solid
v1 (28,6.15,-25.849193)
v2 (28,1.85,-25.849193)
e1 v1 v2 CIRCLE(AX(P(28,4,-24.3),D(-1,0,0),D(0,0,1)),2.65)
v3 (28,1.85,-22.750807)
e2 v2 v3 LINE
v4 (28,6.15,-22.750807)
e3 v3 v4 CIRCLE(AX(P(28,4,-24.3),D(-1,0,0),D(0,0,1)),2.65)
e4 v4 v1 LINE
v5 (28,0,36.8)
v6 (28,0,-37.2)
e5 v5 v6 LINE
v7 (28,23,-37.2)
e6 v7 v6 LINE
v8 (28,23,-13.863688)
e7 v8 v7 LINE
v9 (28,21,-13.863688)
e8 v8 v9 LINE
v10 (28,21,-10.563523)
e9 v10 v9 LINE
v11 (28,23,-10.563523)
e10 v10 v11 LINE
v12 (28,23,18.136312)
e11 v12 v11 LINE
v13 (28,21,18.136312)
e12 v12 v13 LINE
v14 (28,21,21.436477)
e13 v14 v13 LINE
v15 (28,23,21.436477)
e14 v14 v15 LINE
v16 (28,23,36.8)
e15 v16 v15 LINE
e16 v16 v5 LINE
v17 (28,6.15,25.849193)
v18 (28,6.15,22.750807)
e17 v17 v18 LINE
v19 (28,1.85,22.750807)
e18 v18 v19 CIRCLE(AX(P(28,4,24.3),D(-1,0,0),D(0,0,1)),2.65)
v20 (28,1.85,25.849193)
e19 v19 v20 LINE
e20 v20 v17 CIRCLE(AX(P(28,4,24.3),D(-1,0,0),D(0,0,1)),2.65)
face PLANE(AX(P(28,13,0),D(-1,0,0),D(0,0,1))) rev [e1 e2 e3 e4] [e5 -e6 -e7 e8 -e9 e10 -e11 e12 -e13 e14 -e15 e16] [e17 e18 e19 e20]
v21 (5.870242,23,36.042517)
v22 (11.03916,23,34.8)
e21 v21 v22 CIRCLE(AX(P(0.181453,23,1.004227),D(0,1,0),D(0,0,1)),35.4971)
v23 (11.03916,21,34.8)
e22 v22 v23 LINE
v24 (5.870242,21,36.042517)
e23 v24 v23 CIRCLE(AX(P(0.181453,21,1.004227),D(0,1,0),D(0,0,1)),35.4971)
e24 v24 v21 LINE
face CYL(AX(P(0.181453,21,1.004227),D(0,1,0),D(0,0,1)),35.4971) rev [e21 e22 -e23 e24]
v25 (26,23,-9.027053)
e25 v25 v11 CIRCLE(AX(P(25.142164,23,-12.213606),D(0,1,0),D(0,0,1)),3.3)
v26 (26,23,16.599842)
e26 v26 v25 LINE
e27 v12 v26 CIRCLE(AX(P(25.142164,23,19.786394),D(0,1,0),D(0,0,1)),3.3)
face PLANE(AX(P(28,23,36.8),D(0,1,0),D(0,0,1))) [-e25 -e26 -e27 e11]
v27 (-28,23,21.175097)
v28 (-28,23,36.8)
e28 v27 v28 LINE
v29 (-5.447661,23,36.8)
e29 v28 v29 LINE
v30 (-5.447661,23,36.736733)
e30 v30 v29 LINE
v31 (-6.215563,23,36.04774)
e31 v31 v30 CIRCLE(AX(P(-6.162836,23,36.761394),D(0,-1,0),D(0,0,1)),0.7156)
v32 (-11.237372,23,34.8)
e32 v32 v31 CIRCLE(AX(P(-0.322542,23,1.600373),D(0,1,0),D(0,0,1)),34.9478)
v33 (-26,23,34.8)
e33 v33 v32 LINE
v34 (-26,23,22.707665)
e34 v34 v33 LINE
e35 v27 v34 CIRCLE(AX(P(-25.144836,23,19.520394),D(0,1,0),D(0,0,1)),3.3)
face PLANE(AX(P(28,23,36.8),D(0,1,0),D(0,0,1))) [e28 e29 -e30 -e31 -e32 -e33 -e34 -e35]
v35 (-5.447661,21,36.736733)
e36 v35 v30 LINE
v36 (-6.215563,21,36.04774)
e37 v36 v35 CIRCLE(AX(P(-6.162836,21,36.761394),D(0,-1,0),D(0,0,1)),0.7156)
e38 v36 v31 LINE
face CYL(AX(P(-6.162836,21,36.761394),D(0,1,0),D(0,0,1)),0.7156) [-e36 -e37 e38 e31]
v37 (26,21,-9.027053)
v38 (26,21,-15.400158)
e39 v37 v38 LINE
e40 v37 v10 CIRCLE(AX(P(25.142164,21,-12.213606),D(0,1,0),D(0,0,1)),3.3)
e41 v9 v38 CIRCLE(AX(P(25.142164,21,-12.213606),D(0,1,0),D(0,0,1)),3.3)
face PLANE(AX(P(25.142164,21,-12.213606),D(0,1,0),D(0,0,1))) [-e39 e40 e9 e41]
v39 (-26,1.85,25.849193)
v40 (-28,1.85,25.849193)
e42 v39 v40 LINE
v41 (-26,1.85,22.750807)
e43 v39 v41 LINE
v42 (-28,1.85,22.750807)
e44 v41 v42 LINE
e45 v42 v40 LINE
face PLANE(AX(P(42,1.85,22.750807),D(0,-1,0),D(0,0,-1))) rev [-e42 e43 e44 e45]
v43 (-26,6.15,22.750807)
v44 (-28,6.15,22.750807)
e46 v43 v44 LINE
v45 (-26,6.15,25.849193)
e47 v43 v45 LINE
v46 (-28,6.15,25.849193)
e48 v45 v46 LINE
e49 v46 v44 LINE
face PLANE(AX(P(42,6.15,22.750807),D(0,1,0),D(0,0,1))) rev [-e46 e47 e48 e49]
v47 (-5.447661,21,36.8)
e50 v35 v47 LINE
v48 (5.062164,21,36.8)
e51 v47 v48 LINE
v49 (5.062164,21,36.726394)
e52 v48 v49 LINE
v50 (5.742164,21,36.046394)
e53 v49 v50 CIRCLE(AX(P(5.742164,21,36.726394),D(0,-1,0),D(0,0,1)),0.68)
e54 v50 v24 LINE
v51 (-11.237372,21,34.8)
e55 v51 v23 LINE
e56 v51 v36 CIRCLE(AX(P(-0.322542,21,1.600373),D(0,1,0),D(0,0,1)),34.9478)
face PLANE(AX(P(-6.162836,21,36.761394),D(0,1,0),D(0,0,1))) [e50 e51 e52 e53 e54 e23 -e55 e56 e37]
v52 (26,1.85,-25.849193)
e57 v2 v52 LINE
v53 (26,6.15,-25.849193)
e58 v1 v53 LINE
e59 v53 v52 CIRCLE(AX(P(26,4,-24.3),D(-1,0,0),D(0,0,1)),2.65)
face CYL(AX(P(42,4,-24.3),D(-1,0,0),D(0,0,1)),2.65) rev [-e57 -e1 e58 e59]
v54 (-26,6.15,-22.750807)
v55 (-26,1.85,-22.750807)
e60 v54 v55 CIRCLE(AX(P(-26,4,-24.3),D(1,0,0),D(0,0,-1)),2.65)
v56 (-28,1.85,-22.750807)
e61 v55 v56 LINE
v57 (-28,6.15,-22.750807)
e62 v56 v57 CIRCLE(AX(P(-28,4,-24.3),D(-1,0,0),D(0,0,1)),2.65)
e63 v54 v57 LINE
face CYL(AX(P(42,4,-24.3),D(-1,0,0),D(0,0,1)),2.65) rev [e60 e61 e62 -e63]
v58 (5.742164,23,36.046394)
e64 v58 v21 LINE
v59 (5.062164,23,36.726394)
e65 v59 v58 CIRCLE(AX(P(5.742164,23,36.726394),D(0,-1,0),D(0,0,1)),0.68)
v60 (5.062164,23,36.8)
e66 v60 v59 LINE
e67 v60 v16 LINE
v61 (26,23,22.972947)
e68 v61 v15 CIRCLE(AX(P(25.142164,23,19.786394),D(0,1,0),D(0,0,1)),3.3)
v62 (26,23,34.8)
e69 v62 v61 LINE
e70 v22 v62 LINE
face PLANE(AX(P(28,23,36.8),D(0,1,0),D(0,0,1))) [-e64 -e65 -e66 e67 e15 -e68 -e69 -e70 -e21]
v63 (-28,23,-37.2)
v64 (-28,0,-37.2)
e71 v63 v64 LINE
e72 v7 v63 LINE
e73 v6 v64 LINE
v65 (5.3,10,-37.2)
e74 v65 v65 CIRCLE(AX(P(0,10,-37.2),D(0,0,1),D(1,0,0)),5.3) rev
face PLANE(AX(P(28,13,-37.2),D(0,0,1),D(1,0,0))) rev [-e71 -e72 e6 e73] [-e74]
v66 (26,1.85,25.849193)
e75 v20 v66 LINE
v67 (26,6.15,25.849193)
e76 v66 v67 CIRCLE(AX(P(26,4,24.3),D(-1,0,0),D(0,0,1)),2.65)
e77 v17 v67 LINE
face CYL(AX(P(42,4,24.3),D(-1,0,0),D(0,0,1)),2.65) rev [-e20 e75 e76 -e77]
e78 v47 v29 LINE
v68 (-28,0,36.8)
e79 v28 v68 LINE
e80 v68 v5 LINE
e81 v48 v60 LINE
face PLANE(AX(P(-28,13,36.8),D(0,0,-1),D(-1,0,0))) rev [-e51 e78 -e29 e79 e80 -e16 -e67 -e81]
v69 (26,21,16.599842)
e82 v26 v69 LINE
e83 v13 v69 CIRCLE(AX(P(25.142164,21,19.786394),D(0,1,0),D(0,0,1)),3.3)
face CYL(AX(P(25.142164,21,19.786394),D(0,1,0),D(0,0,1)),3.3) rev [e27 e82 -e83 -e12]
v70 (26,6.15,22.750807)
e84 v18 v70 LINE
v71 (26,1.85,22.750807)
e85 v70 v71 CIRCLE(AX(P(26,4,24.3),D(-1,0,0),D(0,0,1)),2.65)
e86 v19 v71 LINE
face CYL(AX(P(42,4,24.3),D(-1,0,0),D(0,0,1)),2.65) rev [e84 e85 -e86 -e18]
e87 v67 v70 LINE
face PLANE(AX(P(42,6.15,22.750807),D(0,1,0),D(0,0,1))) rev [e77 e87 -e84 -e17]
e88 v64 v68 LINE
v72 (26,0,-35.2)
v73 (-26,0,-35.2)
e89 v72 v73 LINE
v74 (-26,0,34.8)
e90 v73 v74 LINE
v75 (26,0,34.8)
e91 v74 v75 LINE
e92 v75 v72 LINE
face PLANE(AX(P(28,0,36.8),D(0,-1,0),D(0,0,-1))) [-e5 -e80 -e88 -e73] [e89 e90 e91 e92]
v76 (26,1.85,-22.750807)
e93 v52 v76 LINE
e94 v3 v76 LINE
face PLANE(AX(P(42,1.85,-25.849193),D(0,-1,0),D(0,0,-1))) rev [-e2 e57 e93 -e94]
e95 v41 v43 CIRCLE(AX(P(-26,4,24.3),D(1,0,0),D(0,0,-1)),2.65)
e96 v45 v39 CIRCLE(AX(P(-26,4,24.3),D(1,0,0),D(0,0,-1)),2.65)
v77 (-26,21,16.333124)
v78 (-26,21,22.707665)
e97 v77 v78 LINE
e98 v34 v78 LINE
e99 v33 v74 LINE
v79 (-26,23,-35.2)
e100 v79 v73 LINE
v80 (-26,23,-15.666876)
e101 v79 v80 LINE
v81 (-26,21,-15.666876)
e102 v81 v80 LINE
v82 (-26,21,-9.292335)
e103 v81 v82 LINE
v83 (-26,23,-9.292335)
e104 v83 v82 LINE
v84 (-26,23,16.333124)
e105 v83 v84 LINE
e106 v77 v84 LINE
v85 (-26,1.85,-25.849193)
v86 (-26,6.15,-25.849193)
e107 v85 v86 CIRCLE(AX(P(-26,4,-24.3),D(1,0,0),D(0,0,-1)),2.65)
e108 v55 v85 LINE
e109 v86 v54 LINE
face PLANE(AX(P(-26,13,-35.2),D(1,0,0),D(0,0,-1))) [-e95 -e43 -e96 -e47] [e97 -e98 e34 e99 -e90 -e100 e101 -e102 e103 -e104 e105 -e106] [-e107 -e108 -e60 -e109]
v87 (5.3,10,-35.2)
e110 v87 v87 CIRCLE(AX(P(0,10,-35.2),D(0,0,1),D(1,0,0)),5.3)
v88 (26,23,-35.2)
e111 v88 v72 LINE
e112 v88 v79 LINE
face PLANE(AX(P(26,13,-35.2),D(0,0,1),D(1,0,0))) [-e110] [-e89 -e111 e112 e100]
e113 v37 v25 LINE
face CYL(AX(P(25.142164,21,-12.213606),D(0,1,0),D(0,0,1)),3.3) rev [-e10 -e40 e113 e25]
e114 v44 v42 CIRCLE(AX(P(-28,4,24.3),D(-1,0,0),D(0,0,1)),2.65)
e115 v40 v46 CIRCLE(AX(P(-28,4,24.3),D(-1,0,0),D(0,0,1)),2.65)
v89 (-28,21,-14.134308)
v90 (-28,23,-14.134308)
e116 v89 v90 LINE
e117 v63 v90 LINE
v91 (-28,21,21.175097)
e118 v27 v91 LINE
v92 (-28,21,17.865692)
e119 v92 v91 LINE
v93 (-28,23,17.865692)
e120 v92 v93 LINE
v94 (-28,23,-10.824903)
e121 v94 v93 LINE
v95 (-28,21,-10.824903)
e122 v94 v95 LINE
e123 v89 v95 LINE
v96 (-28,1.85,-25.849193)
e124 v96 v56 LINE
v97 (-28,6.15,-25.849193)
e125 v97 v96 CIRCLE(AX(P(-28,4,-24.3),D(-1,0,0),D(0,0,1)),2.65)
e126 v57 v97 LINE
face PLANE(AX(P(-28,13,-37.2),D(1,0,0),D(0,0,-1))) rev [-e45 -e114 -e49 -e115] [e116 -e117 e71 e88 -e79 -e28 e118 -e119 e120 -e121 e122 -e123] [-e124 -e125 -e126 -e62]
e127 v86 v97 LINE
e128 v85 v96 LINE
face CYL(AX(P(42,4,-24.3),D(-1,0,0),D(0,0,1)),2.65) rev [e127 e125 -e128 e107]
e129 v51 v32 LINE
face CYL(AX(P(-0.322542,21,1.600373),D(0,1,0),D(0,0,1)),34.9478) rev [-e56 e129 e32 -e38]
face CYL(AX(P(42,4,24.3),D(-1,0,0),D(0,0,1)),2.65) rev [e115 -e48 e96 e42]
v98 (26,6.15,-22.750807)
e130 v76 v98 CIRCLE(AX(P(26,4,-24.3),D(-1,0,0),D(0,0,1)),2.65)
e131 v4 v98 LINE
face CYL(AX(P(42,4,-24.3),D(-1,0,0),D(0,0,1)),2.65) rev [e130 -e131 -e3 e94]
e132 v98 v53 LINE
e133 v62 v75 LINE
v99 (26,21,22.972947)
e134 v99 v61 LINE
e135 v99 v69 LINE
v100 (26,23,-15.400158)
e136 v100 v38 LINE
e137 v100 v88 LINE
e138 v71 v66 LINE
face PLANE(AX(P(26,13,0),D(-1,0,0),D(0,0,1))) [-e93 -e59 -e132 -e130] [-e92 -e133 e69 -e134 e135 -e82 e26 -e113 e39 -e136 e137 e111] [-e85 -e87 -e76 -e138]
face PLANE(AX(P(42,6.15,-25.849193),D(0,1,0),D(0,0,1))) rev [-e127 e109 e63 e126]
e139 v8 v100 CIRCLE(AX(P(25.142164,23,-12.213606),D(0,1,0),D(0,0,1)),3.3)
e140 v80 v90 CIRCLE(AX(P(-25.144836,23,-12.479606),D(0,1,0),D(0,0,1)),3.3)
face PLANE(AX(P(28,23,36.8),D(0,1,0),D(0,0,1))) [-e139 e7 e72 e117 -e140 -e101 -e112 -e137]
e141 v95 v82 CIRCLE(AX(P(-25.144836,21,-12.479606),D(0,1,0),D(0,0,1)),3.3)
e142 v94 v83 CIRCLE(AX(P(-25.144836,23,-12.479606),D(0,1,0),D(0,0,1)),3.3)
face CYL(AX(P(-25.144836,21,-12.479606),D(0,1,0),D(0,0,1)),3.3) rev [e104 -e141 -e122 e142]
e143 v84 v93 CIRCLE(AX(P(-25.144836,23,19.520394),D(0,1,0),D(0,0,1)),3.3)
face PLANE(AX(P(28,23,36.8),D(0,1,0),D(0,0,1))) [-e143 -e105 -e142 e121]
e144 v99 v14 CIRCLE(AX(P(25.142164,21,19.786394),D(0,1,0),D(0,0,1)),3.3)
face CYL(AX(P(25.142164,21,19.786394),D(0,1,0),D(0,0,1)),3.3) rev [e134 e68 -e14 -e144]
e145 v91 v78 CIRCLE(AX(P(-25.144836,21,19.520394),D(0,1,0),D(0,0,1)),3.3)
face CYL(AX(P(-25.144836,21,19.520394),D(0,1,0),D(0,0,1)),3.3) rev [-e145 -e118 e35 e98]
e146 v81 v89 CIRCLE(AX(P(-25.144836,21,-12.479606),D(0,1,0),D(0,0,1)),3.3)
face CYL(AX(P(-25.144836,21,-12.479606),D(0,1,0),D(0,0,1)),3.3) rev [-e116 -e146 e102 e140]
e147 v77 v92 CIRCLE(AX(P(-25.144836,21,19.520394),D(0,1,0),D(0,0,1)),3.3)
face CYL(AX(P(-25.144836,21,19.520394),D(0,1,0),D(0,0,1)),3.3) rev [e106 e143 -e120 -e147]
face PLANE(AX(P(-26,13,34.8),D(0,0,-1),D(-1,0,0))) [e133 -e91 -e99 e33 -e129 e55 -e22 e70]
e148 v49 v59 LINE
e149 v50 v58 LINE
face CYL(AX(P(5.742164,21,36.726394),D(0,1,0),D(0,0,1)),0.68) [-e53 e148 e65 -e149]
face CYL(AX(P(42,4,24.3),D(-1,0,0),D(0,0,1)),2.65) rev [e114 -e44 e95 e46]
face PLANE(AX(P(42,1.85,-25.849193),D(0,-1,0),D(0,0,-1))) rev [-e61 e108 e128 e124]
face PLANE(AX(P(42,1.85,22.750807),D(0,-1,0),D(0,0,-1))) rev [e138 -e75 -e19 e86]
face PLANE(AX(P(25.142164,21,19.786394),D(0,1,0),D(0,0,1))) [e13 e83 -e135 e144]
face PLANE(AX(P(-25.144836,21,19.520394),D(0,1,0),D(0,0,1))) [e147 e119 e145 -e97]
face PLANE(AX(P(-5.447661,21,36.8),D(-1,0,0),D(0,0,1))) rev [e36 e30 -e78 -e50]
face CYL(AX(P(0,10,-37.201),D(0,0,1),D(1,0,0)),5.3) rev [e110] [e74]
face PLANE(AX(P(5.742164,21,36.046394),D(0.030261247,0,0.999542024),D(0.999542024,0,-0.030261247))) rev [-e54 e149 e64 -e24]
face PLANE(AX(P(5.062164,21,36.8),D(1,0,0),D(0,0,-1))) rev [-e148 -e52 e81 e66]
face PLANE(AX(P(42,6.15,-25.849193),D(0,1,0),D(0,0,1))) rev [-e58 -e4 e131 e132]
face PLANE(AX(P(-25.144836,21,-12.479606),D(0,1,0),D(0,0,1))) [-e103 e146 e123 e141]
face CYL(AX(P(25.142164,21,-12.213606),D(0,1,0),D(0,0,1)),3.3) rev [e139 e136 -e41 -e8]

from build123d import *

# Parameters (mm, degrees)
BOSS_EXTRUDE1_DEPTH = 13
BOSS_EXTRUDE3_DEPTH = 2.3
BOSS_EXTRUDE4_DEPTH = 2.3
SPLIT1_START        = -4.6
SPLIT1_DEPTH        = 4.6
SKETCH9_W           = 56.929943861
SKETCH9_H           = 73.17042397
BOSS_EXTRUDE5_DEPTH = 34
SKETCH10_W          = 56
SKETCH10_H          = 74
SKETCH10_W_2        = 52
SKETCH10_H_2        = 70
BOSS_EXTRUDE6_DEPTH = 10
SKETCH11_W          = 56
SKETCH11_H          = 74
SKETCH11_W_2        = 52
SKETCH11_H_2        = 70
BOSS_EXTRUDE7_DEPTH = 23
CUT_EXTRUDE1_START  = -74
SKETCH7_R           = 5.3
CUT_EXTRUDE1_DEPTH  = 2
CUT_EXTRUDE2_DEPTH  = 70
CAVITY1_START       = 21.3871
CAVITY1_DEPTH       = 1.6129
SKETCH12_R          = 3.3
CUT_EXTRUDE3_DEPTH  = 2


# Read off the part's stored shape, not the designer's step: Split1, Cavity1
with BuildPart() as part:
    # Sketch1 → Boss-Extrude1 (new body)
    with BuildSketch(Plane(origin=(0, 0, 0), x_dir=(1, 0, 0), z_dir=(0, 1, 0))):
        Polygon((28, 37.2), (-28, 37.2), (-28, -36.8), (28, -36.8), (28, 0), align=None)
        Polygon((26, 0), (26, 35.2), (-26, 35.2), (-26, -34.8), (26, -34.8), align=None, mode=Mode.SUBTRACT)
    extrude(amount=BOSS_EXTRUDE1_DEPTH)


with BuildPart() as body_2:
    # Sketch5 → Boss-Extrude3 (new body)
    with BuildSketch(Plane.XZ):
        with BuildLine():
            Line((-28, 36.8), (28, 36.8))
            Line((28, 36.8), (28, -37.2))
            Line((28, -37.2), (25, -37.2))
            Line((25, -37.2), (25, -9.8))
            ThreePointArc((25, -9.8), (0, 15.2), (-25, -9.8))
            Line((-25, -9.8), (-25, -37.2))
            Line((-25, -37.2), (-28, -37.2))
            Line((-28, -37.2), (-28, 36.8))
        make_face()
    extrude(amount=BOSS_EXTRUDE3_DEPTH)

    # Sketch6 → Boss-Extrude4 (add)
    with BuildSketch(Plane.XZ.offset(2.3)):
        with BuildLine():
            Line((22.7, -37.2), (28, -37.2))
            Line((28, -37.2), (28, 36.8))
            Line((28, 36.8), (-28, 36.8))
            Line((-28, 36.8), (-28, -37.2))
            Line((-28, -37.2), (-22.7, -37.2))
            Line((-22.7, -37.2), (-22.7, -9.8))
            ThreePointArc((-22.7, -9.8), (0, 12.9), (22.7, -9.8))
            Line((22.7, -9.8), (22.7, -37.2))
        make_face()
    extrude(amount=BOSS_EXTRUDE4_DEPTH)

    # Split1 outline → Split1 (cut)
    with BuildSketch(Plane(origin=(0, 0, 0), x_dir=(1, 0, 0), z_dir=(0, 1, 0)).offset(SPLIT1_START)):
        with BuildLine():
            Line((-28, -36.8), (28, -36.8))
            Line((28, -36.8), (28, 37.2))
            Line((28, 37.2), (22.7, 37.2))
            Line((22.7, 37.2), (22.7, 9.8))
            ThreePointArc((22.7, 9.8), (0, -12.9), (-22.7, 9.8))
            Line((-22.7, 9.8), (-22.7, 37.2))
            Line((-22.7, 37.2), (-28, 37.2))
            Line((-28, 37.2), (-28, -36.8))
        make_face()
    extrude(amount=SPLIT1_DEPTH, mode=Mode.SUBTRACT)


with BuildPart() as body_2_2:
    # Sketch9 → Boss-Extrude5 (new body)
    with BuildSketch(Plane(origin=(0, 13, 0), x_dir=(-1, 0, 0), z_dir=(0, 1, 0))):
        with Locations((0.264790437, -0.308922176)):
            Rectangle(SKETCH9_W, SKETCH9_H)
    extrude(amount=BOSS_EXTRUDE5_DEPTH)


with BuildPart() as part_1:
    add(part.part)

    # Combine1: cut body 2 2
    add(body_2_2.part, mode=Mode.SUBTRACT)

    # Sketch10 → Boss-Extrude6 (add)
    with BuildSketch(Plane(origin=(0, 13, 0), x_dir=(1, 0, 0), z_dir=(0, 1, 0))):
        with Locations((0, 0.2)):
            Rectangle(SKETCH10_W, SKETCH10_H)
        with Locations((0, 0.2)):
            Rectangle(SKETCH10_W_2, SKETCH10_H_2, mode=Mode.SUBTRACT)
    extrude(amount=BOSS_EXTRUDE6_DEPTH)

    # Sketch11 → Boss-Extrude7 (add)
    with BuildSketch(Plane(origin=(0, 23, 0), x_dir=(1, 0, 0), z_dir=(0, 1, 0))):
        with Locations((0, 0.2)):
            Rectangle(SKETCH11_W, SKETCH11_H)
        with Locations((0, 0.2)):
            Rectangle(SKETCH11_W_2, SKETCH11_H_2, mode=Mode.SUBTRACT)
    extrude(amount=-BOSS_EXTRUDE7_DEPTH)

    # Sketch7 → Cut-Extrude1 (cut)
    with BuildSketch(Plane.XY.offset(36.8).offset(CUT_EXTRUDE1_START)):
        with Locations((0, 10)):
            Circle(SKETCH7_R)
    extrude(amount=CUT_EXTRUDE1_DEPTH, mode=Mode.SUBTRACT)

    # Sketch8 → Cut-Extrude2 (cut)
    with BuildSketch(Plane.ZY.offset(28)):
        with BuildLine():
            Line((22.750806662, 6.15), (25.849193338, 6.15))
            ThreePointArc((25.849193338, 6.15), (26.95, 4), (25.849193338, 1.85))
            Line((25.849193338, 1.85), (22.750806662, 1.85))
            ThreePointArc((22.750806662, 1.85), (21.65, 4), (22.750806662, 6.15))
        make_face()
        with BuildLine():
            Line((-25.849193338, 6.15), (-22.750806662, 6.15))
            ThreePointArc((-22.750806662, 6.15), (-21.65, 4), (-22.750806662, 1.85))
            Line((-22.750806662, 1.85), (-25.849193338, 1.85))
            ThreePointArc((-25.849193338, 1.85), (-26.95, 4), (-25.849193338, 6.15))
        make_face()
    extrude(amount=-CUT_EXTRUDE2_DEPTH, mode=Mode.SUBTRACT)

    # Cavity1 outline → Cavity1 (cut)
    with BuildSketch(Plane(origin=(0, 0, 0), x_dir=(1, 0, 0), z_dir=(0, 1, 0)).offset(CAVITY1_START)):
        with BuildLine():
            ThreePointArc((-28, -20.441285249), (-27.241688626, -21.665903715), (-26, -22.395928291))
            Line((-26, -22.395928291), (-26, -20.987393289))
            ThreePointArc((-26, -20.987393289), (-27.027836237, -19.527994439), (-26, -18.068595588))
            Line((-26, -18.068595588), (-26, -16.644860586))
            ThreePointArc((-26, -16.644860586), (-27.241688626, -17.374885162), (-28, -18.599503628))
            Line((-28, -18.599503628), (-28, -20.441285249))
        make_face()
        with BuildLine():
            Line((10.014130308, -34.8), (-10.23489996, -34.8))
            ThreePointArc((-10.23489996, -34.8), (-8.230538078, -35.333645486), (-6.197835522, -35.746397685))
            ThreePointArc((-6.197835522, -35.746397685), (-5.469873643, -36.018934875), (-5.147839508, -36.726394439))
            ThreePointArc((-5.147839508, -36.726394439), (-5.146895808, -36.763245519), (-5.144067255, -36.8))
            Line((-5.144067255, -36.8), (4.758391535, -36.8))
            ThreePointArc((4.758391535, -36.8), (4.761220088, -36.763245519), (4.762163763, -36.726394439))
            ThreePointArc((4.762163763, -36.726394439), (5.049199117, -36.033429793), (5.742163763, -35.746394439))
            Line((5.742163763, -35.746394439), (5.822163763, -35.746394439))
            ThreePointArc((5.822163763, -35.746394439), (7.93260454, -35.337235399), (10.014130308, -34.8))
        make_face()
        with BuildLine():
            Line((-28, 13.400496372), (-28, 11.558714751))
            ThreePointArc((-28, 11.558714751), (-27.241688626, 10.334096285), (-26, 9.604071709))
            Line((-26, 9.604071709), (-26, 11.033690962))
            ThreePointArc((-26, 11.033690962), (-26.997836237, 12.482005561), (-26, 13.930320161))
            Line((-26, 13.930320161), (-26, 15.355139414))
            ThreePointArc((-26, 15.355139414), (-27.241688626, 14.625114838), (-28, 13.400496372))
        make_face()
        with BuildLine():
            Line((26, -21.24169048), (26, -22.661132164))
            ThreePointArc((26, -22.661132164), (27.243136742, -21.927868824), (28, -20.698957885))
            Line((28, -20.698957885), (28, -18.873830992))
            ThreePointArc((28, -18.873830992), (27.243136742, -17.644920054), (26, -16.911656713))
            Line((26, -16.911656713), (26, -18.334298397))
            ThreePointArc((26, -18.334298397), (27.012163763, -19.787994439), (26, -21.24169048))
        make_face()
        with BuildLine():
            ThreePointArc((26, 9.338867836), (27.243136742, 10.072131176), (28, 11.301042115))
            Line((28, 11.301042115), (28, 13.126169008))
            ThreePointArc((28, 13.126169008), (27.243136742, 14.355079946), (26, 15.088343287))
            Line((26, 15.088343287), (26, 13.682945544))
            ThreePointArc((26, 13.682945544), (27.032163763, 12.222005562), (26, 10.761065579))
            Line((26, 10.761065579), (26, 9.338867836))
        make_face()
    extrude(amount=CAVITY1_DEPTH, mode=Mode.SUBTRACT)

    # Sketch12 → Cut-Extrude3 (cut)
    with BuildSketch(Plane(origin=(0, 23, 0), x_dir=(1, 0, 0), z_dir=(0, 1, 0))):
        with Locations((-25.144836237, 12.479605561)):
            Circle(SKETCH12_R)
        with Locations((25.142163763, 12.213605561)):
            Circle(SKETCH12_R)
        with Locations((25.142163763, -19.786394439)):
            Circle(SKETCH12_R)
        with Locations((-25.144836237, -19.520394439)):
            Circle(SKETCH12_R)
        with BuildLine():
            Line((-5.144067255, -36.8), (4.758391535, -36.8))
            Line((4.758391535, -36.8), (5.062163763, -36.8))
            Line((5.062163763, -36.8), (5.062163763, -36.726394439))
            ThreePointArc((5.062163763, -36.726394439), (5.261331152, -36.245561827), (5.742163763, -36.046394439))
            Line((5.742163763, -36.046394439), (5.870241965, -36.042516857))
            ThreePointArc((5.870241965, -36.042516857), (8.935204114, -35.405039737), (11.932081344, -34.5))
            Line((11.932081344, -34.5), (-12.110811403, -34.5))
            ThreePointArc((-12.110811403, -34.5), (-9.196992953, -35.402634382), (-6.215562743, -36.047739555))
            ThreePointArc((-6.215562743, -36.047739555), (-5.68493716, -36.228763375), (-5.447661294, -36.736733155))
            Line((-5.447661294, -36.736733155), (-5.447661294, -36.8))
            Line((-5.447661294, -36.8), (-5.144067255, -36.8))
        make_face()
    extrude(amount=-CUT_EXTRUDE3_DEPTH, mode=Mode.SUBTRACT)


solid = part_1.part
